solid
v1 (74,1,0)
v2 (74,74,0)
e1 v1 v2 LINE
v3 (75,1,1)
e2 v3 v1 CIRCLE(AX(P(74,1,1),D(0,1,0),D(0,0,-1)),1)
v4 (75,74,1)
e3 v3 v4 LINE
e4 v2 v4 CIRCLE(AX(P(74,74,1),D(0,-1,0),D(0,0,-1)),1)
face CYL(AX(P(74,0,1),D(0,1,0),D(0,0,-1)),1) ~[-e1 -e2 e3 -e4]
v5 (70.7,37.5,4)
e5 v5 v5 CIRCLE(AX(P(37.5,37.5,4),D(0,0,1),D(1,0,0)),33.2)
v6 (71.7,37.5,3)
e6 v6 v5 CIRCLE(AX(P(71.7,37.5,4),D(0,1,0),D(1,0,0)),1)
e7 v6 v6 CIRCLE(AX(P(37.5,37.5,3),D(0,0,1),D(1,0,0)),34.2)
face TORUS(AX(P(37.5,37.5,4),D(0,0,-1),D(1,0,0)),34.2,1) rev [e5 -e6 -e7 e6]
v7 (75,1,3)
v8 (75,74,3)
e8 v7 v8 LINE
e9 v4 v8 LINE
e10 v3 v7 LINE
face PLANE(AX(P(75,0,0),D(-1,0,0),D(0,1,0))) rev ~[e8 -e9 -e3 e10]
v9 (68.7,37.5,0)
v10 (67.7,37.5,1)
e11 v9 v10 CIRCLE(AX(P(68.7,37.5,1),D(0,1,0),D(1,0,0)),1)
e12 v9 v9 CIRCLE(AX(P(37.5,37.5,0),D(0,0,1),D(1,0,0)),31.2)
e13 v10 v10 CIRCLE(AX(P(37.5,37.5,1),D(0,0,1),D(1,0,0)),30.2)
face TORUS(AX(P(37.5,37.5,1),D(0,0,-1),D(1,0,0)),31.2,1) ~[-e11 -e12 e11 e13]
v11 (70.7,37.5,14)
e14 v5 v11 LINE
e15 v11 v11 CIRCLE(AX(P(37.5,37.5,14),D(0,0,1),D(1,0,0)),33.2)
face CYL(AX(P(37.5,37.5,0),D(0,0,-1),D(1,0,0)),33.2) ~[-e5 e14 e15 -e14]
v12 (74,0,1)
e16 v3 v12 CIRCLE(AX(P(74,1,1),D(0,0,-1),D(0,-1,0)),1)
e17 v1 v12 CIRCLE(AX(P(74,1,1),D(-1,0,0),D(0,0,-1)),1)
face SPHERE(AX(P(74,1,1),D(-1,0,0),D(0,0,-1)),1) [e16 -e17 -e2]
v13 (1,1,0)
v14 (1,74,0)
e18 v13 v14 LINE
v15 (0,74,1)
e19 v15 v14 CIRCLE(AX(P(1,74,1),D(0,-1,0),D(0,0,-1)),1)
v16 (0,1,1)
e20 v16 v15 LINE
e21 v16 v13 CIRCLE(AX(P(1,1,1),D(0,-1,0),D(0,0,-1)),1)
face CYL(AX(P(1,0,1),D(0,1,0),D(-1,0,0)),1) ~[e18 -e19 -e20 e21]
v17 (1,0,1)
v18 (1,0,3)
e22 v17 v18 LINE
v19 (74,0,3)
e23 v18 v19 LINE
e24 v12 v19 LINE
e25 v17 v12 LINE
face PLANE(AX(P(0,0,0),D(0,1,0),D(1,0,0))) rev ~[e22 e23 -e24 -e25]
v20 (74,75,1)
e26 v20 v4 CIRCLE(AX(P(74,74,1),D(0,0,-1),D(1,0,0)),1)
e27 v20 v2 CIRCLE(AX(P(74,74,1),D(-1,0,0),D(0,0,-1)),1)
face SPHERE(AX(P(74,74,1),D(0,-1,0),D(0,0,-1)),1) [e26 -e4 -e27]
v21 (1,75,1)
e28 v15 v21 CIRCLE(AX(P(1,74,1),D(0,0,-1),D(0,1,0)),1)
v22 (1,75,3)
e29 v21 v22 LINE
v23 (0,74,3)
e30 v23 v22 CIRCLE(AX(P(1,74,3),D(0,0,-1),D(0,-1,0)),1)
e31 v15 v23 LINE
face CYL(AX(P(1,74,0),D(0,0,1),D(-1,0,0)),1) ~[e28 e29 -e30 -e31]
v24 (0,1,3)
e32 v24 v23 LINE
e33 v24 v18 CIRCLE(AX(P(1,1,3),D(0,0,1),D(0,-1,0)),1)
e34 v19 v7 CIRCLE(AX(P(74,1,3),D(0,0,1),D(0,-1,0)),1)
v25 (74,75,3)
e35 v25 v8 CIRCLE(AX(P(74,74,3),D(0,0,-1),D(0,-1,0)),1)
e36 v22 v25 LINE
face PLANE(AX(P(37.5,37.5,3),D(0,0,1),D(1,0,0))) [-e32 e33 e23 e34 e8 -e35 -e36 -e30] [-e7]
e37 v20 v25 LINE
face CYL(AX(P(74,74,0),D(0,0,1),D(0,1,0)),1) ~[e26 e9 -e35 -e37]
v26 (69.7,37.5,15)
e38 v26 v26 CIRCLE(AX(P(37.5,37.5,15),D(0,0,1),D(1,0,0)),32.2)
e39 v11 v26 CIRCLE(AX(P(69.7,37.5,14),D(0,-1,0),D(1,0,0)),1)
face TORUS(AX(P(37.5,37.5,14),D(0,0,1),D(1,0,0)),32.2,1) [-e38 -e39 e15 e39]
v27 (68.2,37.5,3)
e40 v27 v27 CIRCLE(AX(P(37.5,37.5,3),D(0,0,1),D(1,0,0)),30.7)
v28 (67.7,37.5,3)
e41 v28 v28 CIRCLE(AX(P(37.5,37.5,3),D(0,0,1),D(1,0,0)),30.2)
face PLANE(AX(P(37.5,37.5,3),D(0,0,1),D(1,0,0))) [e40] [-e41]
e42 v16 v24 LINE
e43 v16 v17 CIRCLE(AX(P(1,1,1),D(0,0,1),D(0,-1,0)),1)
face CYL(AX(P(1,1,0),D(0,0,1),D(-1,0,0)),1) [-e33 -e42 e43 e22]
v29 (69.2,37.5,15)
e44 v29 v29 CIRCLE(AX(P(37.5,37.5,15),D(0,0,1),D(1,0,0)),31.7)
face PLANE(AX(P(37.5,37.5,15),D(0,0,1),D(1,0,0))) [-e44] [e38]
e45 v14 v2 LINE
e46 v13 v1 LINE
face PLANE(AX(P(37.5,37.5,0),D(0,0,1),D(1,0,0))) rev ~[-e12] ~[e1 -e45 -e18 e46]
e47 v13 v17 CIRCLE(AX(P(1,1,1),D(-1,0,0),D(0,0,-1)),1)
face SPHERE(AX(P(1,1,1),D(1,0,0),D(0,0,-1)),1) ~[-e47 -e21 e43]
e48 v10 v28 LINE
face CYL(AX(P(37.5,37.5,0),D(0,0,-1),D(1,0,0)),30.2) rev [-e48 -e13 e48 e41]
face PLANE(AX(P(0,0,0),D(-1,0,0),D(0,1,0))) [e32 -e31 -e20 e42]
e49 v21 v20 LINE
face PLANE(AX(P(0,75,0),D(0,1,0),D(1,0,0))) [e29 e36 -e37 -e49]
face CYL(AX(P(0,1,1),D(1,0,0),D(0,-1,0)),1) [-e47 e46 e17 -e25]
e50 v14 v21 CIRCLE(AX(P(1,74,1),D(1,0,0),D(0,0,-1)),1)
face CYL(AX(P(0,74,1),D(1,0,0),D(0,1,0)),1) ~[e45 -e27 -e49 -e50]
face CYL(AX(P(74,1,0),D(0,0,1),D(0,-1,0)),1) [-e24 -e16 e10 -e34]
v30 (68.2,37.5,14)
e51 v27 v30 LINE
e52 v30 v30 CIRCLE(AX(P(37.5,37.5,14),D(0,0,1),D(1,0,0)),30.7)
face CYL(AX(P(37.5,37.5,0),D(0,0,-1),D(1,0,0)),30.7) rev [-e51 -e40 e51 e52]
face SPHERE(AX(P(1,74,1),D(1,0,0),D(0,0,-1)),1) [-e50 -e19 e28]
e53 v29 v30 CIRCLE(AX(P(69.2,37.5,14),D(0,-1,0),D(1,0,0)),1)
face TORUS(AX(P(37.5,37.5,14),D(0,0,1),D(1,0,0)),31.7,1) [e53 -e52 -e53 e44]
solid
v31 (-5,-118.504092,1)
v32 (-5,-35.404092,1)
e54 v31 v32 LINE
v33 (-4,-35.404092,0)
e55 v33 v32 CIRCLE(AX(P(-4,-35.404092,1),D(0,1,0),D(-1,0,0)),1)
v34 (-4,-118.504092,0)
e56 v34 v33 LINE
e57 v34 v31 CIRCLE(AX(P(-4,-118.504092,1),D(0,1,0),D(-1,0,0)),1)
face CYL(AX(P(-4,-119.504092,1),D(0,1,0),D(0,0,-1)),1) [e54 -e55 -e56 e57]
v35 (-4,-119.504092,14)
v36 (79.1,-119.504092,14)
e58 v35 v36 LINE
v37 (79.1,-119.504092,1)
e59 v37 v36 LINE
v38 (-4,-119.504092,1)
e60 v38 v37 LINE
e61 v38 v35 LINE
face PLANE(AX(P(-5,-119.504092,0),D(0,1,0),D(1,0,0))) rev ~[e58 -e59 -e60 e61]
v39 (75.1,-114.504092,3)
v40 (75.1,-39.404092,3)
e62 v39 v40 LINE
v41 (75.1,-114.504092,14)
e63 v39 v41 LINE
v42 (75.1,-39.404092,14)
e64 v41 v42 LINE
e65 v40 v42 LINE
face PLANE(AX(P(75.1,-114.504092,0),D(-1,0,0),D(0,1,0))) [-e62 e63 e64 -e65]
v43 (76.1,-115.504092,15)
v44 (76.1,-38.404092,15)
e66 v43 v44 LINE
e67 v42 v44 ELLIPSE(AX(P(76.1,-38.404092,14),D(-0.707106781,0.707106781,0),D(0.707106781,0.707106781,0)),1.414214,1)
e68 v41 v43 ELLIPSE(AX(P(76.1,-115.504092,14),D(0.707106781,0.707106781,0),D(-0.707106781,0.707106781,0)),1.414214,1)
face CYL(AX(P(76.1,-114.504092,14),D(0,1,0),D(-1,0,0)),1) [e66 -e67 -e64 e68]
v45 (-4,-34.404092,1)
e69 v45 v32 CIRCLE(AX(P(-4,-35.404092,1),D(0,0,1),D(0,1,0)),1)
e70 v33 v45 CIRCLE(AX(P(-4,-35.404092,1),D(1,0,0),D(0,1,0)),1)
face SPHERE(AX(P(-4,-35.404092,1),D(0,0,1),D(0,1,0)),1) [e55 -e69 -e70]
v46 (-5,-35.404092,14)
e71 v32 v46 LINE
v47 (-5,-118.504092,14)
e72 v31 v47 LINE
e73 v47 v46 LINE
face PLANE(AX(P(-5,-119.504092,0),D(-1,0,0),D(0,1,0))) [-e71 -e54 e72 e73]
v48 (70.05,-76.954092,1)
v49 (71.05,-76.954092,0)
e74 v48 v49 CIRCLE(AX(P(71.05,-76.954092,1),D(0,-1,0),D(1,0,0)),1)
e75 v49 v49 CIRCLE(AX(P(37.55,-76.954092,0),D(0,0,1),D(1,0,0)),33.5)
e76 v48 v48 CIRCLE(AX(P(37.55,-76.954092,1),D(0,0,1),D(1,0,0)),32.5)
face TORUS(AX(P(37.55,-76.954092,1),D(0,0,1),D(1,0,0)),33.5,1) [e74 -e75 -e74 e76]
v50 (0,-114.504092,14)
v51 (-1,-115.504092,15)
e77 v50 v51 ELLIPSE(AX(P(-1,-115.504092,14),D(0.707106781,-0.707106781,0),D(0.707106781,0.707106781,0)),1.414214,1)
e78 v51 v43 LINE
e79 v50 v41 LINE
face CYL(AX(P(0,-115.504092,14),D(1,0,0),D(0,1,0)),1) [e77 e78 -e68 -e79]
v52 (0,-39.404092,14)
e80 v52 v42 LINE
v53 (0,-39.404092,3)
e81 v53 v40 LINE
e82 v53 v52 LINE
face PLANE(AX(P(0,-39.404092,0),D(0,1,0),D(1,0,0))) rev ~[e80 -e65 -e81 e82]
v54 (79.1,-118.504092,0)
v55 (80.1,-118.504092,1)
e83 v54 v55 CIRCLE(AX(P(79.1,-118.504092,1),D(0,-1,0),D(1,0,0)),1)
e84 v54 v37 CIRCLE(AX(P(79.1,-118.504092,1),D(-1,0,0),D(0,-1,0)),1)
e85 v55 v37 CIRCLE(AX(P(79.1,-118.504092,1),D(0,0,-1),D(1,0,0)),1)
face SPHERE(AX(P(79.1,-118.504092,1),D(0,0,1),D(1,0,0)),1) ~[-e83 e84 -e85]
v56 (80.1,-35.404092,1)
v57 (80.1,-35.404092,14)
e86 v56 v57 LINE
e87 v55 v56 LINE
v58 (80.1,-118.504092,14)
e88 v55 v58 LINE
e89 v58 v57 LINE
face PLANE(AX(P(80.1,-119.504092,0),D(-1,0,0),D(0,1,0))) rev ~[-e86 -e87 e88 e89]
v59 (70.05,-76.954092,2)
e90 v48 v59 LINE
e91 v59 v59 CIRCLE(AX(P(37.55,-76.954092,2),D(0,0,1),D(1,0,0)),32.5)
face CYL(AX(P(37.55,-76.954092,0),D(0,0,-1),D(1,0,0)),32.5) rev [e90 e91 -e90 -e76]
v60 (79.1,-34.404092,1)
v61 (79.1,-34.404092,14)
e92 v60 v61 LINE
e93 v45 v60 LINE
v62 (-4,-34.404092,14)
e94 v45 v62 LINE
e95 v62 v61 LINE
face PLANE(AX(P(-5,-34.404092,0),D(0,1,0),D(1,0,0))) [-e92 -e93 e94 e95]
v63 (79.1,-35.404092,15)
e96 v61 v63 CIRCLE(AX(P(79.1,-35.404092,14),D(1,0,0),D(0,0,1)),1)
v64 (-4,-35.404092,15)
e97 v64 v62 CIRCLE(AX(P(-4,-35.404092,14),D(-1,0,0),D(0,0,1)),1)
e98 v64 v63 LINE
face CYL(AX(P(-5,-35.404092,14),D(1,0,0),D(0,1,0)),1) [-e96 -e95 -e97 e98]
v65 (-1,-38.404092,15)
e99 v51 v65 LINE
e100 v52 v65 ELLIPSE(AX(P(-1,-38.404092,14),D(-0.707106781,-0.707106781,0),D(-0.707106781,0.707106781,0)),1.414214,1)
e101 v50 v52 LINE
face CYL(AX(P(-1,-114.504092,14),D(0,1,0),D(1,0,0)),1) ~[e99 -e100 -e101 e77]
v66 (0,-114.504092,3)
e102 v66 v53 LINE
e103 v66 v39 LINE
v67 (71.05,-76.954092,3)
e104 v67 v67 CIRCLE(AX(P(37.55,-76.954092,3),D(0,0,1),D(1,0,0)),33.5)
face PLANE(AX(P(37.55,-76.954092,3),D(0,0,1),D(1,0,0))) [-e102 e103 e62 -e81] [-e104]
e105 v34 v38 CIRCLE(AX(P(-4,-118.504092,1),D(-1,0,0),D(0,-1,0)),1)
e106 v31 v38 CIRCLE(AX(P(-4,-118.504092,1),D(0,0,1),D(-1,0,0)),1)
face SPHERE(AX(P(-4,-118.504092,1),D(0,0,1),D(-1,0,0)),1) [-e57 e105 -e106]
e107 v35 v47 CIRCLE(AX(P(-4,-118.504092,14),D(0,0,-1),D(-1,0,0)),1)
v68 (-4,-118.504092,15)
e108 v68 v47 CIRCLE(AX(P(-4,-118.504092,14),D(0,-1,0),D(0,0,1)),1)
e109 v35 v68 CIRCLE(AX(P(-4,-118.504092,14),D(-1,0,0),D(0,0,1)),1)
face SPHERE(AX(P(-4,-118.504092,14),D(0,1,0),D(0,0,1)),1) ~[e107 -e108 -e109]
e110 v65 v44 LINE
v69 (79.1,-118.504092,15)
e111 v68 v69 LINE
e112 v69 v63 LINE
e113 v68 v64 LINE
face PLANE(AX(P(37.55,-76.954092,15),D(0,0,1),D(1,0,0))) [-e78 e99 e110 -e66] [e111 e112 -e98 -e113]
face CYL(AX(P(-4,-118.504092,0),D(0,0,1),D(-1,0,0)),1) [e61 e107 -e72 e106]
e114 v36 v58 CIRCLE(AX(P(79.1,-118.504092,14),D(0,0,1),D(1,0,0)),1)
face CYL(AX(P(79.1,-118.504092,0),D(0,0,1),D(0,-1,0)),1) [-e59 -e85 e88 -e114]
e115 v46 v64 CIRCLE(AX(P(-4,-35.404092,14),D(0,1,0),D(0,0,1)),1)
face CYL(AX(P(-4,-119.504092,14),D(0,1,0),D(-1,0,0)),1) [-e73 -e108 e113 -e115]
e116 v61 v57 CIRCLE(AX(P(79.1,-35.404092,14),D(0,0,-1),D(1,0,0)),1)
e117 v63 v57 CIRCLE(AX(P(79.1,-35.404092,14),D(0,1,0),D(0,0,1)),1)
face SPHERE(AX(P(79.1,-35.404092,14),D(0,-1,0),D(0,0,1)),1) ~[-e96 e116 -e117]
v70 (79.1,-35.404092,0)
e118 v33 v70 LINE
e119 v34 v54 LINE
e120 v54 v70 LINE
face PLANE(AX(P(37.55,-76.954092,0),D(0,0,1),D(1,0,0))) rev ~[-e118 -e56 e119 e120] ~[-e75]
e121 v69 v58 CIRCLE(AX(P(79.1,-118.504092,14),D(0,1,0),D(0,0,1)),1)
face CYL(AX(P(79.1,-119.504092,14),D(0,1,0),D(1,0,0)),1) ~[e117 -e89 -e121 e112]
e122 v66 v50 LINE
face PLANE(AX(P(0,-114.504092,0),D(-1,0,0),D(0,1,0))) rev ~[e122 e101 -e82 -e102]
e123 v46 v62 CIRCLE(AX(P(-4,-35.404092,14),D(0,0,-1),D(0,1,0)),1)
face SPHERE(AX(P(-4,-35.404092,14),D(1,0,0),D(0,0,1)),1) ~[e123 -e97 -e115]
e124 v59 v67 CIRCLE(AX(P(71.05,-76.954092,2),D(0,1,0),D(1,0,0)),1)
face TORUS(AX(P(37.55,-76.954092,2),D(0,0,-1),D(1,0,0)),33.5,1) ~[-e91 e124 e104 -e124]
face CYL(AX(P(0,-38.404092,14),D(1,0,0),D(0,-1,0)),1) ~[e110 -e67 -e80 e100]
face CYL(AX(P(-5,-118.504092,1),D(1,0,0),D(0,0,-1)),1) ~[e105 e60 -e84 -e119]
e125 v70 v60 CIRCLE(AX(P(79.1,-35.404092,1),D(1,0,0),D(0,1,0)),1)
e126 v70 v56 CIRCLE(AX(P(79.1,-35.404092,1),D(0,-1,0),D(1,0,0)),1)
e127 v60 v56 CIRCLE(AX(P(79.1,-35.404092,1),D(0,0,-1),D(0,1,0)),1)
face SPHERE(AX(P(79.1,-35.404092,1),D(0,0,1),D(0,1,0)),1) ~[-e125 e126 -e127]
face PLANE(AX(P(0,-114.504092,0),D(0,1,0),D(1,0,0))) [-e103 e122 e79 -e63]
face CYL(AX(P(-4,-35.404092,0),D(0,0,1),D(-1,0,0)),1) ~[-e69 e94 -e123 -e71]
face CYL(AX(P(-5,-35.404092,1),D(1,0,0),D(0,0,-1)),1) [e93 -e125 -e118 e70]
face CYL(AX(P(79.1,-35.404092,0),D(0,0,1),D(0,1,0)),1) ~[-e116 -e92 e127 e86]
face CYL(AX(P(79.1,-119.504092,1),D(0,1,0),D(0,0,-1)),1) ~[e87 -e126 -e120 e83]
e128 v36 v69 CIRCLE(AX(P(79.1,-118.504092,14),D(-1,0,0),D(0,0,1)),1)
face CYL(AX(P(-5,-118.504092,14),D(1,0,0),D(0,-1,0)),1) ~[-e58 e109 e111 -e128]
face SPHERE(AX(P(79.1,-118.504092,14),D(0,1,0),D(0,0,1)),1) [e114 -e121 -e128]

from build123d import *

# Parameters (mm, degrees)
F0_R     = 33.2
F0_R_2   = 30.7
F1_DEPTH = 15
F0_W     = 85.1
F0_H     = 85.1
F0_W_2   = 75.1
F0_H_2   = 75.1
F0_W_3   = 75
F0_H_3   = 75
F0_R_3   = 30.2
F2_DEPTH = 3
F0_R_4   = 32.5
F3_R     = 1
F3_2_R   = 1


# Not quite as in the source:
# - a feature names something its author has since deleted; it is built from what else it names


with BuildPart() as f1:
    # F0 (on Top) → F1 (new body)
    with BuildSketch(Plane.XY):
        with Locations((37.5, 37.5)):
            Circle(F0_R)
        with Locations((37.5, 37.5)):
            Circle(F0_R_2, mode=Mode.SUBTRACT)
    extrude(amount=F1_DEPTH)

    # F0 (on Top) → F2 (join)
    with BuildSketch(Plane.XY):
        with Locations((37.5, 37.5)):
            Rectangle(F0_W_3, F0_H_3)
        with Locations((37.5, 37.5)):
            Circle(F0_R, mode=Mode.SUBTRACT)
        with Locations((37.5, 37.5)):
            Circle(F0_R_2)
        with Locations((37.5, 37.5)):
            Circle(F0_R_3, mode=Mode.SUBTRACT)
    extrude(amount=F2_DEPTH)

    # F3
    f3_edges = [f1.edges().sort_by_distance(p)[0] for p in [
        (6.8, 37.5, 15),
        (4.3, 37.5, 15),
        (37.5, 0, 0),
        (75, 37.5, 0),
        (37.5, 75, 0),
        (0, 37.5, 0),
        (7.3, 37.5, 0),
        (75, 75, 1.5),
        (0, 75, 1.5),
        (0, 0, 1.5),
        (75, 0, 1.5),
        (4.3, 37.5, 3),
    ]]
    fillet(f3_edges, radius=F3_R)


with BuildPart() as f1b:
    # F0 (on Top) → F1, piece 2 (new body)
    with BuildSketch(Plane.XY):
        with Locations((37.55, -76.9540923819)):
            Rectangle(F0_W, F0_H)
        with Locations((37.55, -76.9540924937)):
            Rectangle(F0_W_2, F0_H_2, mode=Mode.SUBTRACT)
    extrude(amount=F1_DEPTH)

    # F0 (on Top) → F2, piece 2 (join)
    with BuildSketch(Plane.XY):
        with Locations((37.55, -76.9540924937)):
            Rectangle(F0_W_2, F0_H_2)
        with Locations((37.55, -76.9540923819)):
            Circle(F0_R_4, mode=Mode.SUBTRACT)
    extrude(amount=F2_DEPTH)

    # F3#2
    f3_2_edges = [f1b.edges().sort_by_distance(p)[0] for p in [
        (80.1, -76.954092, 15),
        (37.55, -34.404092, 15),
        (-5, -76.954092, 15),
        (37.55, -119.504092, 15),
        (-5, -119.504092, 7.5),
        (80.1, -119.504092, 7.5),
        (80.1, -34.404092, 7.5),
        (-5, -34.404092, 7.5),
        (37.55, -34.404092, 0),
        (80.1, -76.954092, 0),
        (5.05, -76.954092, 0),
        (-5, -76.954092, 0),
        (37.55, -119.504092, 0),
        (5.05, -76.954092, 3),
        (0, -76.954092, 15),
        (37.55, -39.404092, 15),
        (75.1, -76.954092, 15),
        (37.55, -114.504092, 15),
    ]]
    fillet(f3_2_edges, radius=F3_2_R)


solid = Compound([f1.part, f1b.part])
